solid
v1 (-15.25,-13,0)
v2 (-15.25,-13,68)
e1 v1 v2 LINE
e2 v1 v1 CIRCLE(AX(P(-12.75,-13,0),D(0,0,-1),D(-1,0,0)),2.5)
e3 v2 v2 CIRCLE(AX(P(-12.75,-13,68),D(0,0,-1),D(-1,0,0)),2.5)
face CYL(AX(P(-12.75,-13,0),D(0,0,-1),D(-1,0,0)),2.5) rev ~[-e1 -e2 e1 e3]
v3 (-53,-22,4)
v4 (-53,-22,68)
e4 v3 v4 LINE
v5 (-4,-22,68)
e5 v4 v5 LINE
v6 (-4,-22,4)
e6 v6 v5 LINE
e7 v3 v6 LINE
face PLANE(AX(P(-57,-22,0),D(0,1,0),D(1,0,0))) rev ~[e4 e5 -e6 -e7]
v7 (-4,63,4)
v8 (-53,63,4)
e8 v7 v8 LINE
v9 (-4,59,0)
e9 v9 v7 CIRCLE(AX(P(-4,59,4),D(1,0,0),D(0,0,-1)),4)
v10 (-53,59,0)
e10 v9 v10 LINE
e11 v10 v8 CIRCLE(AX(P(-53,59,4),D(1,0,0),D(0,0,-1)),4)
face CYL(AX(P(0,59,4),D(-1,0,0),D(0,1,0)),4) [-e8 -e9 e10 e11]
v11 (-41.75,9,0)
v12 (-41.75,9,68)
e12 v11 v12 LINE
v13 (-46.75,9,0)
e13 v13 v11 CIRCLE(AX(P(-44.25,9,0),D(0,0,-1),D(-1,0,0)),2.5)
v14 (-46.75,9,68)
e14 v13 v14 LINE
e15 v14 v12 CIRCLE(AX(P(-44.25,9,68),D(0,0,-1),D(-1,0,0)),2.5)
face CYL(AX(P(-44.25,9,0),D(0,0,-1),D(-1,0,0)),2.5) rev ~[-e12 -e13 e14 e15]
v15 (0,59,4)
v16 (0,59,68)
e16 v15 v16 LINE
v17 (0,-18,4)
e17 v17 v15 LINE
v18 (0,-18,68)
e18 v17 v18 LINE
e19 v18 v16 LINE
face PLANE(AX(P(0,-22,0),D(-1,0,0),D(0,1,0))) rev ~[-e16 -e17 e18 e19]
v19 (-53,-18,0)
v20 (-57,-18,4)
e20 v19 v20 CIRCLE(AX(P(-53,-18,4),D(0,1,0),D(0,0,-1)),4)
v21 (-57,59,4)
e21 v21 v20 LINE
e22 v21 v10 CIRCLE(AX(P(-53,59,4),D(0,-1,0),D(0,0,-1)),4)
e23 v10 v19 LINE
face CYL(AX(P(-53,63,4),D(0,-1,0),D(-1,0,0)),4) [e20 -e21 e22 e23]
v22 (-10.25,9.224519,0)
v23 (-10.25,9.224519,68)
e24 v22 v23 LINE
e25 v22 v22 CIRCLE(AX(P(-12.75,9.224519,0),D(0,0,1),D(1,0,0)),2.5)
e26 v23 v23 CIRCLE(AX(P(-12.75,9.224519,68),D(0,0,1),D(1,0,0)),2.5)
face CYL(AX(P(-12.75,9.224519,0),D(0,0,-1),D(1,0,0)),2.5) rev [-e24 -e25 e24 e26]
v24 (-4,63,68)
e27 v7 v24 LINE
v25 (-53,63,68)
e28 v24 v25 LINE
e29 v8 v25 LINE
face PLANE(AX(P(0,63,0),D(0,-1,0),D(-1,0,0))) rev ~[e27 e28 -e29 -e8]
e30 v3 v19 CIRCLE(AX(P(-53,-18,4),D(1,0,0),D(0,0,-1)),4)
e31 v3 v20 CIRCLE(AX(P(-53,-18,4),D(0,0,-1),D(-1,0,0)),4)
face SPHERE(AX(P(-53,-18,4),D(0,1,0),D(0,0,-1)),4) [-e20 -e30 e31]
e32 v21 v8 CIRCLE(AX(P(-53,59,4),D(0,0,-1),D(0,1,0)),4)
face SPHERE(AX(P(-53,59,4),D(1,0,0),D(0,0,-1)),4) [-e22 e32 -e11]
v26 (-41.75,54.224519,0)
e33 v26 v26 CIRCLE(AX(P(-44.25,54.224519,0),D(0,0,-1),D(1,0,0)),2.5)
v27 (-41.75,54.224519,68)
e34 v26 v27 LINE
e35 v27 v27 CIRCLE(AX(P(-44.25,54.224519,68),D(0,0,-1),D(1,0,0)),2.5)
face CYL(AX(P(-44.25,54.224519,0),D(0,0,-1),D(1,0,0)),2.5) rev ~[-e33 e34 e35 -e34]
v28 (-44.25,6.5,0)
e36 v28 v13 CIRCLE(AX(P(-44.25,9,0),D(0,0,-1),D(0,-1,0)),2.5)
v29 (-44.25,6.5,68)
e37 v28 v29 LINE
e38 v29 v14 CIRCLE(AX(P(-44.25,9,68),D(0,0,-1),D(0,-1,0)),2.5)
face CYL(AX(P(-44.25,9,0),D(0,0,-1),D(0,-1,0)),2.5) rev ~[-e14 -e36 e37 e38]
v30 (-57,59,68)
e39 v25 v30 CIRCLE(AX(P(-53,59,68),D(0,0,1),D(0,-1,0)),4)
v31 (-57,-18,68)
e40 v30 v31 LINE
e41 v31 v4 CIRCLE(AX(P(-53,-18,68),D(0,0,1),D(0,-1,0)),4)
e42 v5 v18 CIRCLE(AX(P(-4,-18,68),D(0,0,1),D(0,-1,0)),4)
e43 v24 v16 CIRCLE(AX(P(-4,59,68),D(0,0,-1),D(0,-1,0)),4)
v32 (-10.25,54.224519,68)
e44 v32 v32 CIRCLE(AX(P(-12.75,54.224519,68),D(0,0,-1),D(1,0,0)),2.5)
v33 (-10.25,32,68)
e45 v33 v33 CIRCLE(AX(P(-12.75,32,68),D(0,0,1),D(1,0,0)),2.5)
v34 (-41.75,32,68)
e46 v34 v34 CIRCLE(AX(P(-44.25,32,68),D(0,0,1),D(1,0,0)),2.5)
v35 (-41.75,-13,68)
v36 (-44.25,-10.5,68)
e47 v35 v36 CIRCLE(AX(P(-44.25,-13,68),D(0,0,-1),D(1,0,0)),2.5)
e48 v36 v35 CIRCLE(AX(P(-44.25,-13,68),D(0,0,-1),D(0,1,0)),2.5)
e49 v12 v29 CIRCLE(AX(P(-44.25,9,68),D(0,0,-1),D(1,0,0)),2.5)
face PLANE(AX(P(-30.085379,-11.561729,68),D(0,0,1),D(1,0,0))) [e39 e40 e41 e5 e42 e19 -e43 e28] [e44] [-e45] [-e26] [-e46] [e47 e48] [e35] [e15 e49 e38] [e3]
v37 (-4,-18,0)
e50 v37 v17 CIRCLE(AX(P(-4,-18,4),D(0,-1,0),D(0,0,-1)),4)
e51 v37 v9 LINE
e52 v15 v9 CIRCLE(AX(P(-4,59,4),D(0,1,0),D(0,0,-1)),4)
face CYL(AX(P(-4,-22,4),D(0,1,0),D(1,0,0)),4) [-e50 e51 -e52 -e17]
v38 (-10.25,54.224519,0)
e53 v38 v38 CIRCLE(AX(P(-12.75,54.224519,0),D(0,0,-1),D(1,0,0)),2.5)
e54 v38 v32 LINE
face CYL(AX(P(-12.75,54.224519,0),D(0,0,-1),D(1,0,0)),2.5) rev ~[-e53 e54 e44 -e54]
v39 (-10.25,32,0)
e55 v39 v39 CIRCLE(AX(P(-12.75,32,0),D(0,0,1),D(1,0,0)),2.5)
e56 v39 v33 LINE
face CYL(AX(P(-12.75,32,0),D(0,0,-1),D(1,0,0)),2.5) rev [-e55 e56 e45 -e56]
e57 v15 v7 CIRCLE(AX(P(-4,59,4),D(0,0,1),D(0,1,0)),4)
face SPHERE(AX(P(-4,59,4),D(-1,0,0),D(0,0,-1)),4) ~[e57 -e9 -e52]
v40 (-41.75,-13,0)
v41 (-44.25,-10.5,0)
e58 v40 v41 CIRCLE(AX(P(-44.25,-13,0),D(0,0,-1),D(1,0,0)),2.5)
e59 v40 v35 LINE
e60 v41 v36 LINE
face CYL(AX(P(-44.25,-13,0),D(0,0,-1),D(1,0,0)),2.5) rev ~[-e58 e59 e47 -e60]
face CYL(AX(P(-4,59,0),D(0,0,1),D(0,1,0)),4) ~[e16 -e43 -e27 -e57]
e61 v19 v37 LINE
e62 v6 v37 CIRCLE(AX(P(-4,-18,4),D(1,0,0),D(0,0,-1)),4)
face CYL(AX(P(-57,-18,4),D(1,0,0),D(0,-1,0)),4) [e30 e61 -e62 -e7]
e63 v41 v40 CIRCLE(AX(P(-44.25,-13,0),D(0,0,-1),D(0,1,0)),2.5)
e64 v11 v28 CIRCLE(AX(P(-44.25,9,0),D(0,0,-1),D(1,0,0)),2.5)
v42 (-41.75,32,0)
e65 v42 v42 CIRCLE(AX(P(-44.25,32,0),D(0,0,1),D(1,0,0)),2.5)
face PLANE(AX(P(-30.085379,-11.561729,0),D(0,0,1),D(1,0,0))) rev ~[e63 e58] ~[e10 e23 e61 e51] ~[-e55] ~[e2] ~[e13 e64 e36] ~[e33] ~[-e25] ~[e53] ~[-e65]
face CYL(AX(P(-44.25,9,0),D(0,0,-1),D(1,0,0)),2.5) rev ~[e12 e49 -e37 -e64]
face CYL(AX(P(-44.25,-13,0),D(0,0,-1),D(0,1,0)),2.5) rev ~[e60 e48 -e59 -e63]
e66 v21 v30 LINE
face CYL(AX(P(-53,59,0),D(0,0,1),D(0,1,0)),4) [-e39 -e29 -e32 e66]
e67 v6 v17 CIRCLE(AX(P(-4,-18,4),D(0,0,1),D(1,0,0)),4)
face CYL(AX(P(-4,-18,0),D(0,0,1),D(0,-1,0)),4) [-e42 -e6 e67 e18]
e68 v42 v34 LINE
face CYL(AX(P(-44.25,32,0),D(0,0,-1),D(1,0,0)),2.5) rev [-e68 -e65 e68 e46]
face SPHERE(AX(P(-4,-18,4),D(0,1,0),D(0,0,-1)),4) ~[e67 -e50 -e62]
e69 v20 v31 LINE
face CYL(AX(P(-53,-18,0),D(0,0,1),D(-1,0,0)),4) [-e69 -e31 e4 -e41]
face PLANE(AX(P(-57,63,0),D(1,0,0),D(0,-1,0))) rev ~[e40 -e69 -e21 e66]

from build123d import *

# Parameters (mm, degrees)
F0_R     = 2.5
F1_DEPTH = 68
F2_R     = 4


with BuildPart() as f1:
    # F0 (on Top) → F1 (new body)
    with BuildSketch(Plane.XY):
        with BuildLine():
            Line((-44.25, -10.5), (-44.25, 0))
            Line((-44.25, 0), (-57, 0))
            Line((-57, 0), (-57, -22))
            Line((-57, -22), (0, -22))
            Line((0, -22), (0, 0))
            Line((0, 0), (-28.5, 0))
            Line((-28.5, 0), (-28.5, -13))
            Line((-28.5, -13), (-41.75, -13))
            ThreePointArc((-41.75, -13), (-46.017766953, -14.767766953), (-44.25, -10.5))
        make_face()
        with BuildLine():
            ThreePointArc((-10.25, -13), (-12.75, -15.5), (-15.25, -13))
            ThreePointArc((-15.25, -13), (-12.75, -10.5), (-10.25, -13))
        make_face(mode=Mode.SUBTRACT)
        with BuildLine():
            Line((-44.25, 6.5), (-44.25, 0))
            Line((-44.25, 0), (-28.5, 0))
            Line((-28.5, 0), (0, 0))
            Line((0, 0), (0, 63))
            Line((0, 63), (-57, 63))
            Line((-57, 63), (-57, 9))
            Line((-57, 9), (-46.75, 9))
            ThreePointArc((-46.75, 9), (-44.25, 11.5), (-41.75, 9))
            ThreePointArc((-41.75, 9), (-42.482233047, 7.232233047), (-44.25, 6.5))
        make_face()
        with Locations((-12.75, 9.2245186158)):
            Circle(F0_R, mode=Mode.SUBTRACT)
        with Locations((-44.25, 32)):
            Circle(F0_R, mode=Mode.SUBTRACT)
        with BuildLine():
            ThreePointArc((-46.75, 54.2245186158), (-44.25, 56.7245186158), (-41.75, 54.2245186158))
            ThreePointArc((-41.75, 54.2245186158), (-44.25, 51.7245186158), (-46.75, 54.2245186158))
        make_face(mode=Mode.SUBTRACT)
        with Locations((-12.75, 32)):
            Circle(F0_R, mode=Mode.SUBTRACT)
        with BuildLine():
            ThreePointArc((-15.25, 54.2245186158), (-12.75, 56.7245186158), (-10.25, 54.2245186158))
            ThreePointArc((-10.25, 54.2245186158), (-12.75, 51.7245186158), (-15.25, 54.2245186158))
        make_face(mode=Mode.SUBTRACT)
        with BuildLine():
            Line((-57, 0), (-44.25, 0))
            Line((-44.25, 0), (-44.25, 6.5))
            ThreePointArc((-44.25, 6.5), (-46.017766953, 7.232233047), (-46.75, 9))
            Line((-46.75, 9), (-57, 9))
            Line((-57, 9), (-57, 0))
        make_face()
        with BuildLine():
            Line((-28.5, 0), (-44.25, 0))
            Line((-44.25, 0), (-44.25, -10.5))
            ThreePointArc((-44.25, -10.5), (-42.482233047, -11.232233047), (-41.75, -13))
            Line((-41.75, -13), (-28.5, -13))
            Line((-28.5, -13), (-28.5, 0))
        make_face()
    extrude(amount=F1_DEPTH)

    # F2
    f2_edges = [f1.edges().sort_by_distance(p)[0] for p in [
        (-28.5, 63, 0),
        (0, 20.5, 0),
        (-57, 20.5, 0),
        (-57, 63, 34),
        (0, 63, 34),
        (-28.5, -22, 0),
        (-57, -22, 34),
        (0, -22, 34),
    ]]
    fillet(f2_edges, radius=F2_R)


solid = f1.part
